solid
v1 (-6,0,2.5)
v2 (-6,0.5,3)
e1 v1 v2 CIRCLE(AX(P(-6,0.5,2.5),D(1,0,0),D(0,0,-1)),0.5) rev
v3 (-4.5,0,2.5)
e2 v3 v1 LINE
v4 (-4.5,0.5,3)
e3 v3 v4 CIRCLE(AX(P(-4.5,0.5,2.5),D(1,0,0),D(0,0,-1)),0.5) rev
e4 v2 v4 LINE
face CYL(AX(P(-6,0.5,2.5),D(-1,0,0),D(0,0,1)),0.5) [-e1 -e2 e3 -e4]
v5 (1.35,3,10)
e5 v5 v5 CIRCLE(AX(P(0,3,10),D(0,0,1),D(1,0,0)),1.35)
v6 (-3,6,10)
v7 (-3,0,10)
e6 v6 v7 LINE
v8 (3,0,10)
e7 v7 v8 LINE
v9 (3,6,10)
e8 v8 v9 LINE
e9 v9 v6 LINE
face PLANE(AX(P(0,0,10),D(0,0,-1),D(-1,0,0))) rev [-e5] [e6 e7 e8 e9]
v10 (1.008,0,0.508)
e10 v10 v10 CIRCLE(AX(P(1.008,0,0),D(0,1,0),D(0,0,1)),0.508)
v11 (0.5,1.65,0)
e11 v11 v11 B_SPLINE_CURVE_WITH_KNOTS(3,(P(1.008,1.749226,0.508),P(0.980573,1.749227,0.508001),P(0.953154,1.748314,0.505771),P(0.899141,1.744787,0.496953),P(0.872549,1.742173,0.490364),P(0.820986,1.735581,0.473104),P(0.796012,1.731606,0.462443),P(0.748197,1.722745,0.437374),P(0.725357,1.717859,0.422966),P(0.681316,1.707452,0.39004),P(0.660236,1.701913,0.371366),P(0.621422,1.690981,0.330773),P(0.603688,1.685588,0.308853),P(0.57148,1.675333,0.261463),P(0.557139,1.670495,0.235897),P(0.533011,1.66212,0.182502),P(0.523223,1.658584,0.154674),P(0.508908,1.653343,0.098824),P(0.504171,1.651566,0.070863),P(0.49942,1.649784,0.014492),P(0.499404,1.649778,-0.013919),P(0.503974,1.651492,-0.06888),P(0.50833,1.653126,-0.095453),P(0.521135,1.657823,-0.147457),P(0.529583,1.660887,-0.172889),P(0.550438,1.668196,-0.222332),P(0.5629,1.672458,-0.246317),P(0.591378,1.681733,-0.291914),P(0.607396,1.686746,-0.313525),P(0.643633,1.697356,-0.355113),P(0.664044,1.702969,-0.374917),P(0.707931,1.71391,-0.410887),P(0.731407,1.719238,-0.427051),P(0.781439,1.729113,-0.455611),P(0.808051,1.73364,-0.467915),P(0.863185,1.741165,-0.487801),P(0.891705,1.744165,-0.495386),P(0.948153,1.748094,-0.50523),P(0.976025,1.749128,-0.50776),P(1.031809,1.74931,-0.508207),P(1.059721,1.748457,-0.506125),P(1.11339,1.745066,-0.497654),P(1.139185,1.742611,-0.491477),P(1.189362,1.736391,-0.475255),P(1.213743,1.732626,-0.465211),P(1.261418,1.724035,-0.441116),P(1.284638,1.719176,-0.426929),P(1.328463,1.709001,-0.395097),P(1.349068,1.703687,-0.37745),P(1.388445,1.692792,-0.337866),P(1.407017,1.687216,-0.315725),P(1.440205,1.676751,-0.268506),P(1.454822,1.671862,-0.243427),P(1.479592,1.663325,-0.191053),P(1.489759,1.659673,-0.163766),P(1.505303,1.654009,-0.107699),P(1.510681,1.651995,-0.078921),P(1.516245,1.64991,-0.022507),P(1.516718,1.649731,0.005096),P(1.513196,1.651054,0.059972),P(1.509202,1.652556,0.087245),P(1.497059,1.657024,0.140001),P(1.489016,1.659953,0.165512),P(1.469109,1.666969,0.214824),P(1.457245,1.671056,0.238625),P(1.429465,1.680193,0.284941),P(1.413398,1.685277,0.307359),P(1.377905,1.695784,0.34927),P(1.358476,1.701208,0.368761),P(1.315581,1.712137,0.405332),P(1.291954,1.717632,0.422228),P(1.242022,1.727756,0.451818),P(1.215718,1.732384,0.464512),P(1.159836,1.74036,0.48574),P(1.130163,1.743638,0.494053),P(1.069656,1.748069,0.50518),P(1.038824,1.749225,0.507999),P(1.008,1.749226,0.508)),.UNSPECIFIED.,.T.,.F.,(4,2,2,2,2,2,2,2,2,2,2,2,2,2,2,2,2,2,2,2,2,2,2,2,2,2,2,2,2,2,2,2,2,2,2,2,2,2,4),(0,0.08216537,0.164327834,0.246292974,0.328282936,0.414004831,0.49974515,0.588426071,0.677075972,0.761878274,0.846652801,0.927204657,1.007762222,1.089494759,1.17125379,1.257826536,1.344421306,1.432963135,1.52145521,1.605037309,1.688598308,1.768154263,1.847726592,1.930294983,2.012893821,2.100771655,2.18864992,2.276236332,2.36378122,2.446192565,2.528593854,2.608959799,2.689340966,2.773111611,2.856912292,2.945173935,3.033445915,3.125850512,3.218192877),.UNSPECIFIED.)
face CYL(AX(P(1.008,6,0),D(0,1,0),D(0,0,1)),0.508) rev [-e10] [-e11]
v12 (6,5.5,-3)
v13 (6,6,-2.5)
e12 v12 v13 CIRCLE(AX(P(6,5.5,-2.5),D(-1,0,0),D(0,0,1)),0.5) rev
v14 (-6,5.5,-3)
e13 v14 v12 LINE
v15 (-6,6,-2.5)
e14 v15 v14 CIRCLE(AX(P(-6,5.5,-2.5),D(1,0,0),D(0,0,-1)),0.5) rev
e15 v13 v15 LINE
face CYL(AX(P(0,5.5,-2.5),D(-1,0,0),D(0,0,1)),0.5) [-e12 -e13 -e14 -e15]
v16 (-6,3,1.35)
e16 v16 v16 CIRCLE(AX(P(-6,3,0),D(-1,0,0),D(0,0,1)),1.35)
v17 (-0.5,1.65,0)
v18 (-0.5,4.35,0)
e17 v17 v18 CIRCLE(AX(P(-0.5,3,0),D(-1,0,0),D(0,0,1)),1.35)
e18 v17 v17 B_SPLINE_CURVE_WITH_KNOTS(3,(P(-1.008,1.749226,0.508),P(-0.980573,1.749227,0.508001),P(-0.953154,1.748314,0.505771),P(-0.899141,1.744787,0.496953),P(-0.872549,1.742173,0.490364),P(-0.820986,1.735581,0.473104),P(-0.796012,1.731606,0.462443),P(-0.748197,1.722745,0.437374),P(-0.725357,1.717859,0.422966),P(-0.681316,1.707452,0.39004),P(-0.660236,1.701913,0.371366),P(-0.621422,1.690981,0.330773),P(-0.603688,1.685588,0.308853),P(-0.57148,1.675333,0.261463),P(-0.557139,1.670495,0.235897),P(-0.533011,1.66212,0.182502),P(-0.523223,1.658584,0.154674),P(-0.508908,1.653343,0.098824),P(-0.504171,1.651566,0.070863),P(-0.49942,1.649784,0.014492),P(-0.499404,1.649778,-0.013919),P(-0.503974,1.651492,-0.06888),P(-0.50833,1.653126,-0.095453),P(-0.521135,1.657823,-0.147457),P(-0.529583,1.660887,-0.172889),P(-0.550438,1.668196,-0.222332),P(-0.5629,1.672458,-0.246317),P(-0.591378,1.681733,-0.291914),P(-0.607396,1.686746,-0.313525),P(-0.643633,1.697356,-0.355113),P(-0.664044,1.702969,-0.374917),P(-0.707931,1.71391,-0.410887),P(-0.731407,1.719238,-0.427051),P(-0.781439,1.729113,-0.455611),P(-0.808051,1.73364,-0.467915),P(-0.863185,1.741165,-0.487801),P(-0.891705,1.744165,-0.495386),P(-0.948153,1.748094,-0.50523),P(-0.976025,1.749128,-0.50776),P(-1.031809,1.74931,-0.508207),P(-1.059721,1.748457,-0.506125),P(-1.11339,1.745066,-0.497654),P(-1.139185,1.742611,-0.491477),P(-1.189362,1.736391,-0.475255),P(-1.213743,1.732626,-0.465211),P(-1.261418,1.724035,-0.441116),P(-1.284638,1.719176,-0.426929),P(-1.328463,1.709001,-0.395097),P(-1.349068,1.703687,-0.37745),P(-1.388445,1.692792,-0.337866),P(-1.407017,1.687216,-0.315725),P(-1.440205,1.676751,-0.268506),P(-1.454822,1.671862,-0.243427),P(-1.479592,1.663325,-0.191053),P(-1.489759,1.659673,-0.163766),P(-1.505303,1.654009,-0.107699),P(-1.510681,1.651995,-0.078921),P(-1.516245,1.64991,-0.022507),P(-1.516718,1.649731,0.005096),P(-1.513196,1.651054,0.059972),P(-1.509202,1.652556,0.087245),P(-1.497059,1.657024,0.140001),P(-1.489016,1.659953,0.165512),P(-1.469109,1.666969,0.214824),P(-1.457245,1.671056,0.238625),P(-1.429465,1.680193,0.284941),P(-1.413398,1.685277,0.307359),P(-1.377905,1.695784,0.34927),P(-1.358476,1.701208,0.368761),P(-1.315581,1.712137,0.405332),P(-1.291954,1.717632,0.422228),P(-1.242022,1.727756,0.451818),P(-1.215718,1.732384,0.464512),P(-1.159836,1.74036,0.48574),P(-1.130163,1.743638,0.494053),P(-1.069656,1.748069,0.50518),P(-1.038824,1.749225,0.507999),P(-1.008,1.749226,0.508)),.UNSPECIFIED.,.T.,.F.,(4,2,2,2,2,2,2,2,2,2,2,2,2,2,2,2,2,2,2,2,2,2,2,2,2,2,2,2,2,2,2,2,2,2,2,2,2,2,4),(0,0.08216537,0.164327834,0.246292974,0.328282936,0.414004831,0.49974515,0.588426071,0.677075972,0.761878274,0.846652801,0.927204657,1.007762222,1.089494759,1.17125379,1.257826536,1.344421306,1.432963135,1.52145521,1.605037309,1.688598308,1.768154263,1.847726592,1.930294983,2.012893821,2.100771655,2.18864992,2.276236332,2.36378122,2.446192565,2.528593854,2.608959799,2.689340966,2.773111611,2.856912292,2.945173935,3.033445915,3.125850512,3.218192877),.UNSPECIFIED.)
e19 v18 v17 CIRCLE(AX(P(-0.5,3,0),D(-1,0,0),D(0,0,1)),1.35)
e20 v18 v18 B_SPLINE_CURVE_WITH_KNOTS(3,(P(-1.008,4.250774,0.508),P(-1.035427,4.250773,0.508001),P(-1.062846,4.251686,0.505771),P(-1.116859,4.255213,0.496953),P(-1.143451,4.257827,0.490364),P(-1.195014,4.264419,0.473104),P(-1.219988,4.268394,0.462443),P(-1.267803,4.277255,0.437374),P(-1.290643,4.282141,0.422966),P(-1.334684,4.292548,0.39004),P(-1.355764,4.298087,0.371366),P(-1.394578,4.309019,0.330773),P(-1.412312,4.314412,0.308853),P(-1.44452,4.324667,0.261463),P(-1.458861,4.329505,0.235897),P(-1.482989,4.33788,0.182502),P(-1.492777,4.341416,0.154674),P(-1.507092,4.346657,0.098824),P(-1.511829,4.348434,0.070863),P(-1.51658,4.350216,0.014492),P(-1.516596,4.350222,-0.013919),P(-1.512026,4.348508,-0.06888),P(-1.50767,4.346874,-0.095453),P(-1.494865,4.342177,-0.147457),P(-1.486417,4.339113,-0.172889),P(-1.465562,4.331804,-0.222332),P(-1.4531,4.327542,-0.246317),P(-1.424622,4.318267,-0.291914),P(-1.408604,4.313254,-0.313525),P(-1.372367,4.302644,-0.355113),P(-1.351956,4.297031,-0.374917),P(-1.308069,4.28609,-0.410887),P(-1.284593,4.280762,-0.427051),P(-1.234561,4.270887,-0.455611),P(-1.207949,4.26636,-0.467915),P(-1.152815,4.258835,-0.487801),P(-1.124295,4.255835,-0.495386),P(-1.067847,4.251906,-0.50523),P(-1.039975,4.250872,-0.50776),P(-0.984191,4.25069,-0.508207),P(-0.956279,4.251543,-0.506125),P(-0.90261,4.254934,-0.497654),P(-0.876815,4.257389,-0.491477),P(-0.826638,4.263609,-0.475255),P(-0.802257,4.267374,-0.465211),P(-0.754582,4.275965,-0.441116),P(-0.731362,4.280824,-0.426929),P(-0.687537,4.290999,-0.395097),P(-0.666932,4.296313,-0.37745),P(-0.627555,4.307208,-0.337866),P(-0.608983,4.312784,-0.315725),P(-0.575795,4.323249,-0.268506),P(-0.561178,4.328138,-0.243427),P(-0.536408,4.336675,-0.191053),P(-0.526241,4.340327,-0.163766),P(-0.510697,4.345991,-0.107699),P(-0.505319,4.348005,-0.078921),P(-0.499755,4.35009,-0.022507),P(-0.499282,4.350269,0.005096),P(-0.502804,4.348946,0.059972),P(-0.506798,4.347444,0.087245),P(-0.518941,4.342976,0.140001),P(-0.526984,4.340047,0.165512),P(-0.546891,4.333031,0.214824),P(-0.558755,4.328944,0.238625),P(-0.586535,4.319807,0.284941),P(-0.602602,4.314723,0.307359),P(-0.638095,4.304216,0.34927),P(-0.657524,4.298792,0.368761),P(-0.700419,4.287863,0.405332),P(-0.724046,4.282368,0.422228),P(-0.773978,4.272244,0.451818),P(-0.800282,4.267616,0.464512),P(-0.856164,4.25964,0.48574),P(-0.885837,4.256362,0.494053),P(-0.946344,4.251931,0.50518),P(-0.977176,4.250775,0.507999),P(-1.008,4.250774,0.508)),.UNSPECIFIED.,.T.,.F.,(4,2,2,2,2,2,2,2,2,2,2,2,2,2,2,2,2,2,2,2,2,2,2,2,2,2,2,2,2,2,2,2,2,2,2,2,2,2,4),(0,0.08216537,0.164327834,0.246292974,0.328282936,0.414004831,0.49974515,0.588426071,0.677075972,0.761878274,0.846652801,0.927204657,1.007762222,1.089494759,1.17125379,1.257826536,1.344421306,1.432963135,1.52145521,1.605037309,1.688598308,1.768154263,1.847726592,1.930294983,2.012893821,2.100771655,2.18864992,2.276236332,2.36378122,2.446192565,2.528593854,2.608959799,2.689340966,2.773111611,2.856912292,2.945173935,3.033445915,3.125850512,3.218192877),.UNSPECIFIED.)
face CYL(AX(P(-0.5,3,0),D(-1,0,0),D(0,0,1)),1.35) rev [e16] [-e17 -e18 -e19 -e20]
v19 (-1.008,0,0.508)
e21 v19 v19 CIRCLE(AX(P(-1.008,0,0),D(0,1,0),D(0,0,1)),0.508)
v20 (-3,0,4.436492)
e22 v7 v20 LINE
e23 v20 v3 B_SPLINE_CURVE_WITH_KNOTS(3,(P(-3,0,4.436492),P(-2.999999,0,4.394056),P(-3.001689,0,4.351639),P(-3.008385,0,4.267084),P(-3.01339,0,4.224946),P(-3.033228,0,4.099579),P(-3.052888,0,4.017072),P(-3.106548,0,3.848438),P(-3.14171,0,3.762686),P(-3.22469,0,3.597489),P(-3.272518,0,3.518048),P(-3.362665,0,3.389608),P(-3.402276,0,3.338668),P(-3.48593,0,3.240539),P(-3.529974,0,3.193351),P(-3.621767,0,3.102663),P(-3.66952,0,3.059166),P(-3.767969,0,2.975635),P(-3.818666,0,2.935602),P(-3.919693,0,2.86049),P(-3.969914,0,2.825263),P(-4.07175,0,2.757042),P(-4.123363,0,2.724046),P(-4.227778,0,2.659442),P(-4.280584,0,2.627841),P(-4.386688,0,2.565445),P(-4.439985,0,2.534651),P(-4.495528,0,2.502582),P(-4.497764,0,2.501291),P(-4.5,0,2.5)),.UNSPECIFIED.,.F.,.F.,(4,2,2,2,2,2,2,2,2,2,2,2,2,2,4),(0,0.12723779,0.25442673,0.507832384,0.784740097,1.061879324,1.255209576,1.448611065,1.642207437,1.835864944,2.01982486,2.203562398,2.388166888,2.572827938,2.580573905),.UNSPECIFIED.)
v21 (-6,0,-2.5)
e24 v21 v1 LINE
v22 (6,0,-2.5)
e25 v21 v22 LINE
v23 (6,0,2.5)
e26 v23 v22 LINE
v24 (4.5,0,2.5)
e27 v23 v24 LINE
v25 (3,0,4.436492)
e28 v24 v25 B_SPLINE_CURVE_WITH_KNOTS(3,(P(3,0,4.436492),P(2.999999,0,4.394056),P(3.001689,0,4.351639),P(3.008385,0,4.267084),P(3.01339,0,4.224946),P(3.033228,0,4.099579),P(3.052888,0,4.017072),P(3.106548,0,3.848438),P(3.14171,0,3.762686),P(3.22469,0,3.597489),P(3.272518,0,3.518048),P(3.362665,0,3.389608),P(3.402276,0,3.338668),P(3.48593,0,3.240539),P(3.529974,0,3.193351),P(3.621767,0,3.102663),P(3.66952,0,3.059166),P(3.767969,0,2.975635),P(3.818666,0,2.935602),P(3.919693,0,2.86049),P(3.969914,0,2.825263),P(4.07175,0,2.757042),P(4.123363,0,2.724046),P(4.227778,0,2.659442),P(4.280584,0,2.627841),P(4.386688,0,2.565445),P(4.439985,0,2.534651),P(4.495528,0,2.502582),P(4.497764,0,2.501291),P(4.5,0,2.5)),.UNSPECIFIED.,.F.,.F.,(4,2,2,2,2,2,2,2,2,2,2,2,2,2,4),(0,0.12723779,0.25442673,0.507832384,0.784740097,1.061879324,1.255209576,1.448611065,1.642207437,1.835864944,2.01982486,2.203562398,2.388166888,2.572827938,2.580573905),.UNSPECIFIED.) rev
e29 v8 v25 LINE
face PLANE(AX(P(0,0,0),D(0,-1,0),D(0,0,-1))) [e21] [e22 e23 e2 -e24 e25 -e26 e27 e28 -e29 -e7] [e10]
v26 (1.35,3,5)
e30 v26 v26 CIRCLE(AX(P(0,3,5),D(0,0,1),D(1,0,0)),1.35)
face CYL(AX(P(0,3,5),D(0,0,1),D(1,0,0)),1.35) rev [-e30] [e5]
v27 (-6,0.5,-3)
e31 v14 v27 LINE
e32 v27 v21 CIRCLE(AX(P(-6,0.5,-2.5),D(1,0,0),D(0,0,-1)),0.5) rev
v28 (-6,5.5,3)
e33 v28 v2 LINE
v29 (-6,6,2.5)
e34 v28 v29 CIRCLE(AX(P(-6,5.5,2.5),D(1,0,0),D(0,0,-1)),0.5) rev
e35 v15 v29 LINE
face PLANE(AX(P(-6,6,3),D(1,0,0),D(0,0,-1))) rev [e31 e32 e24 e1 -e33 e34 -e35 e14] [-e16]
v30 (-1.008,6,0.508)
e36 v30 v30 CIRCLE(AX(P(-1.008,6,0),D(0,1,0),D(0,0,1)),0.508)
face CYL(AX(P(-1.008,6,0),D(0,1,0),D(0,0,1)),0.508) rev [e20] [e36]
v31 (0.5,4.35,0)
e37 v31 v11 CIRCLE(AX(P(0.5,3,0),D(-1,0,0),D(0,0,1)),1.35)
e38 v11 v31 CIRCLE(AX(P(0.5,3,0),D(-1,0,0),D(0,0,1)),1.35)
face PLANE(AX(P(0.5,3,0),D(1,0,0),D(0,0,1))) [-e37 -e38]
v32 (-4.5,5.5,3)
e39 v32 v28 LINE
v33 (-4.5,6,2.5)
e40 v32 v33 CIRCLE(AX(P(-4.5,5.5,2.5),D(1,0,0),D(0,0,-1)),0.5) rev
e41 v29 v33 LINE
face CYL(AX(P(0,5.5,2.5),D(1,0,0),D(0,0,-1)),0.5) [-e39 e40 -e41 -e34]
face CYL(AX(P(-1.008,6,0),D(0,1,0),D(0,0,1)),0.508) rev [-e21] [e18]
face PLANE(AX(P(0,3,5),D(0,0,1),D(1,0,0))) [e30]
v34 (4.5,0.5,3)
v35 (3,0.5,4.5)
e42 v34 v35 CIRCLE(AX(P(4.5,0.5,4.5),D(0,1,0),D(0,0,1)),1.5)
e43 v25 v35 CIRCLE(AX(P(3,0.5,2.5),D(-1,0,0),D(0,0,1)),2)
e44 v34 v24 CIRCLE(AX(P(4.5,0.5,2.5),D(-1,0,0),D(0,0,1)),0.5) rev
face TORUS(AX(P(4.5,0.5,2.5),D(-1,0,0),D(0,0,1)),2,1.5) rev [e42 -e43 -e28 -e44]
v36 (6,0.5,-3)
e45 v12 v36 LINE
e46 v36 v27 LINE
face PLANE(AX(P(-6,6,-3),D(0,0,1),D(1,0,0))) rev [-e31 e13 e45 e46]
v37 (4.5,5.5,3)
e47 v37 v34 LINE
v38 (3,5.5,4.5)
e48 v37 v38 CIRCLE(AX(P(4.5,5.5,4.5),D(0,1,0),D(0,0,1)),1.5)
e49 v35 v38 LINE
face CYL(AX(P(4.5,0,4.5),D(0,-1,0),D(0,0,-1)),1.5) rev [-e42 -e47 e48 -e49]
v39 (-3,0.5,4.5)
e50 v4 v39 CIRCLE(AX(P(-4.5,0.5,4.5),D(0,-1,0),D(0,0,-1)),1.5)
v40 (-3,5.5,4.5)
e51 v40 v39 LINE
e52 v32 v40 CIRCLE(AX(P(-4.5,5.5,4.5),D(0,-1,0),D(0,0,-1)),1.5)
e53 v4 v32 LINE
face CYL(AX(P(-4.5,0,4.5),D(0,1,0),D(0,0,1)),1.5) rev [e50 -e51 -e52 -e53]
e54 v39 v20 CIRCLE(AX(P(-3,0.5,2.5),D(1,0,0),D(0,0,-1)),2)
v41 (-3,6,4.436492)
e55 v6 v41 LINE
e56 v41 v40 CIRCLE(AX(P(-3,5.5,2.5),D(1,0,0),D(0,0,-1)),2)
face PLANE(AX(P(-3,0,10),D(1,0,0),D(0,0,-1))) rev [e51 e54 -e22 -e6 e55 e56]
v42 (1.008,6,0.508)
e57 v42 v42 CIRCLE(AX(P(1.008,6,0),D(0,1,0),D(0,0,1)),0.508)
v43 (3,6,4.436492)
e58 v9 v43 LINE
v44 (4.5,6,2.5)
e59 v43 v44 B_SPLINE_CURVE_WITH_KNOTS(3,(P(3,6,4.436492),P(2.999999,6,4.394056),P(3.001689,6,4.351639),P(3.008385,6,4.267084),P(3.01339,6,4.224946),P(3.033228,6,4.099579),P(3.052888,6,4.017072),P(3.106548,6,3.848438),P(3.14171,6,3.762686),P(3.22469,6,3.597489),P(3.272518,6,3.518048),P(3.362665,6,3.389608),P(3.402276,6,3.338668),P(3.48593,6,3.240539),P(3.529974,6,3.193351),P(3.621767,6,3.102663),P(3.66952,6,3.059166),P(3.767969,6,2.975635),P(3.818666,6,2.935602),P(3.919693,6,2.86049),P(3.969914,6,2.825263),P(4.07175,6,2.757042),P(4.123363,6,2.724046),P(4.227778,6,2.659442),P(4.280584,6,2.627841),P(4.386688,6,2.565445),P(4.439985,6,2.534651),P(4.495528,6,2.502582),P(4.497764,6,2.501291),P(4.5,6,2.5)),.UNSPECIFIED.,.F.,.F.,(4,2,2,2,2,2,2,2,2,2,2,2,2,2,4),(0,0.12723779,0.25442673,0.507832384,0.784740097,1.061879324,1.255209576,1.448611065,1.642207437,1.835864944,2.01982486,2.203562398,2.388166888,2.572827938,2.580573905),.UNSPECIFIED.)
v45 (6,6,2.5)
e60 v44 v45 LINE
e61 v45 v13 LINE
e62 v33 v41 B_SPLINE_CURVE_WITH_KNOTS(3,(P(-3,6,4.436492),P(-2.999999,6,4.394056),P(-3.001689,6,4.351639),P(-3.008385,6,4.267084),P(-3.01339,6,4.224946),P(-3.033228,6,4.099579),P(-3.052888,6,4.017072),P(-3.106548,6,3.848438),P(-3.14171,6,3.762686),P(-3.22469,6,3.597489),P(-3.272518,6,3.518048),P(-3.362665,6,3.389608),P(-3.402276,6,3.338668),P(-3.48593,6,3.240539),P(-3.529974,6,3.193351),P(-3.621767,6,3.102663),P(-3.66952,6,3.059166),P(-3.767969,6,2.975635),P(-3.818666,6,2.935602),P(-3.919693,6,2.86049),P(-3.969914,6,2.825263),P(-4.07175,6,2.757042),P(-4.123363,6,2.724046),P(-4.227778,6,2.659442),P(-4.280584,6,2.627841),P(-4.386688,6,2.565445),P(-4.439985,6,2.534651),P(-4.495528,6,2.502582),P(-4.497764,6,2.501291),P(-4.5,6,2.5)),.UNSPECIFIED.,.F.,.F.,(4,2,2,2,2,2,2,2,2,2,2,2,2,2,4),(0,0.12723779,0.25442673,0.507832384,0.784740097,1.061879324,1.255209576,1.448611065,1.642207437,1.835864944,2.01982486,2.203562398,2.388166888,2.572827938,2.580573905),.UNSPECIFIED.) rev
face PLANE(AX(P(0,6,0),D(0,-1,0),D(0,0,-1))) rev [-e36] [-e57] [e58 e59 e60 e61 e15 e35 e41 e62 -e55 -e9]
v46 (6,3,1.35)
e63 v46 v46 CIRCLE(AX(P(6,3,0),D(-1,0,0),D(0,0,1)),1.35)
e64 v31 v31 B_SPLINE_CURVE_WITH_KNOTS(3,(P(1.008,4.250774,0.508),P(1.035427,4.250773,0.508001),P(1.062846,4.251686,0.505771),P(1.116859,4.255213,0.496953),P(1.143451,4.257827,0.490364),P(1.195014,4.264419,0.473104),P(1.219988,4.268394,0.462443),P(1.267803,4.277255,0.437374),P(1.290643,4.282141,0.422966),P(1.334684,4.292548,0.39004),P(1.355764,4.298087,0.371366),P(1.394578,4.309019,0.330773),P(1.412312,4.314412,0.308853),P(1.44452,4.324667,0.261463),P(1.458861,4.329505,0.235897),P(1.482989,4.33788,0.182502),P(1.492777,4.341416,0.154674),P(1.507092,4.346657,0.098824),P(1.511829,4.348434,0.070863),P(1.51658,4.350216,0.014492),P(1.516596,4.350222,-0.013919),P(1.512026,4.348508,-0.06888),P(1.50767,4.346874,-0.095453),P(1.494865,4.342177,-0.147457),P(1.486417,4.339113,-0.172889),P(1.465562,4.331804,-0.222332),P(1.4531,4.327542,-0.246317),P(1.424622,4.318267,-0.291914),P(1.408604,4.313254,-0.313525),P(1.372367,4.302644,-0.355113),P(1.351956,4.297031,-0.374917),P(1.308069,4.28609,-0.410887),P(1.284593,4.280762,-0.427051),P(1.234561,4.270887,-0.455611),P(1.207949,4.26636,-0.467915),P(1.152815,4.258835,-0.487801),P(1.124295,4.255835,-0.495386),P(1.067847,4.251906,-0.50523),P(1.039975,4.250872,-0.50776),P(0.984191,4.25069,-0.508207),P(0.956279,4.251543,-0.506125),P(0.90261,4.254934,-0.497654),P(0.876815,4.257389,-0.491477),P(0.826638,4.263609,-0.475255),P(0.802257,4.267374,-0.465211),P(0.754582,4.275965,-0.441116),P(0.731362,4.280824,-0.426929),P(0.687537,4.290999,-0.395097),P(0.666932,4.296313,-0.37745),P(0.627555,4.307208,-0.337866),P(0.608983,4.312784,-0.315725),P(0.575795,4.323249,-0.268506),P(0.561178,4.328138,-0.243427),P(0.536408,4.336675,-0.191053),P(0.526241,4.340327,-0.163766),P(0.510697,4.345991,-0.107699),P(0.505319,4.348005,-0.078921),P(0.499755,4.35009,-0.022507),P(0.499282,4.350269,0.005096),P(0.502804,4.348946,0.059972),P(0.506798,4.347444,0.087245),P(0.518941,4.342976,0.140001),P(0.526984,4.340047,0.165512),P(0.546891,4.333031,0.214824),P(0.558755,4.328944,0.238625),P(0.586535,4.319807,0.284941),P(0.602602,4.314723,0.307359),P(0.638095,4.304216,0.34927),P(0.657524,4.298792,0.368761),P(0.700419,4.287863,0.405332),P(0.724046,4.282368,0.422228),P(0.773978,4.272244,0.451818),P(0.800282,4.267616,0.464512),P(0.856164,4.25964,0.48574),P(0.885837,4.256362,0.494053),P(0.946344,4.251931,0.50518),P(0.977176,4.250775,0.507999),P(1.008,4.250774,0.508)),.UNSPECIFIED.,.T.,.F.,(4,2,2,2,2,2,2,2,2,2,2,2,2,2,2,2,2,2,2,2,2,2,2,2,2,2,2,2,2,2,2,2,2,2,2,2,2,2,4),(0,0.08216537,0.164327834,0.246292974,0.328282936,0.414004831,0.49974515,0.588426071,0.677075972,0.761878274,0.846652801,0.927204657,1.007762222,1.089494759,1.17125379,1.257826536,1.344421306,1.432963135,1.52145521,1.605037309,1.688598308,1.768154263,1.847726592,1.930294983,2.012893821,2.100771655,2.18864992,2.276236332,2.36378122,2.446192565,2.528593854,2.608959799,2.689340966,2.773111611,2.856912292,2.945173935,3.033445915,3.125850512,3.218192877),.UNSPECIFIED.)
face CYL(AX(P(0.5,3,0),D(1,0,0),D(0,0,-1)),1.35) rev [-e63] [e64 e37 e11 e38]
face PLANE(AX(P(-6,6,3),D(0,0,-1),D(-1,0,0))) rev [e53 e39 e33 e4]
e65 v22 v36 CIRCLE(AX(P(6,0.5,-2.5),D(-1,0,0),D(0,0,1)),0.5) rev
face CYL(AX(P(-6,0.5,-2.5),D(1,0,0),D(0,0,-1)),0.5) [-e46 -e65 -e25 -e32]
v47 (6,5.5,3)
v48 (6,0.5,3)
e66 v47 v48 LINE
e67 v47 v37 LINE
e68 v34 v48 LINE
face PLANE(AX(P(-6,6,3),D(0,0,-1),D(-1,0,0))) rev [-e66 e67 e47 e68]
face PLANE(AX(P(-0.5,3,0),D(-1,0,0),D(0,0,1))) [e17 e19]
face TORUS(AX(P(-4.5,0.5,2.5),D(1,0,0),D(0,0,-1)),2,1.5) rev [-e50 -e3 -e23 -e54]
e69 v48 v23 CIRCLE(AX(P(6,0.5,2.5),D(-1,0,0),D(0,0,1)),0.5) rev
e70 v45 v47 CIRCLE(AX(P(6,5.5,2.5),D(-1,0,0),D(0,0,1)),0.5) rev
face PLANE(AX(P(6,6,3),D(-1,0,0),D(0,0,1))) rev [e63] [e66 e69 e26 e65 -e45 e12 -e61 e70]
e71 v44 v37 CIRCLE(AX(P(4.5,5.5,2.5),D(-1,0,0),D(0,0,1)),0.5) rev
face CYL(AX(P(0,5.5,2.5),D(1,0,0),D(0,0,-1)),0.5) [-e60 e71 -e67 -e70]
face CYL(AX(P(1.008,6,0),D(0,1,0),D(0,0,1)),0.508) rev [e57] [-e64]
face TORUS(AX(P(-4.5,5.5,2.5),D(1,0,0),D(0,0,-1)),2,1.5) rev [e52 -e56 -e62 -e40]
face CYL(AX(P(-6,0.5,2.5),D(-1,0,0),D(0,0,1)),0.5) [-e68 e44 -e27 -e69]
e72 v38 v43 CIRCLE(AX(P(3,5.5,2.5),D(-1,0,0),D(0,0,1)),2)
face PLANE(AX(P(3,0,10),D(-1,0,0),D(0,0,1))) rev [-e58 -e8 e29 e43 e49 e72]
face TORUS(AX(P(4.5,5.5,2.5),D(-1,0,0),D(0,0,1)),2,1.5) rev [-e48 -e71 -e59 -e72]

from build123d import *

# Parameters (mm, degrees)
SKETCH1_W                  = 12
SKETCH1_H                  = 6
BOSS_EXTRUDE1_DEPTH        = 6
F_60_0_04_DIAMETER_HOLE1_D = 1.016
SKETCH15_W                 = 6
SKETCH15_H                 = 6
BOSS_EXTRUDE2_DEPTH        = 7
FILLET4_R                  = 0.5
FILLET3_R                  = 1.5
SKETCH19_R                 = 1.35
CUT_EXTRUDE1_DEPTH         = 5.5
SKETCH16_R                 = 1.35
CUT_EXTRUDE2_DEPTH         = 5


with BuildPart() as part:
    # Sketch1 → Boss-Extrude1 (new body)
    with BuildSketch(Plane(origin=(0, 0, 0), x_dir=(1, 0, 0), z_dir=(0, 1, 0))):
        Rectangle(SKETCH1_W, SKETCH1_H)
    extrude(amount=BOSS_EXTRUDE1_DEPTH)

    # #60 (0.04) Diameter Hole1 (through all)
    with Locations(Plane(origin=(0, 6, 0), x_dir=(1, 0, 0), z_dir=(0, 1, 0))):
        with Locations((1.008, 0), (-1.008, 0)):
            Hole(F_60_0_04_DIAMETER_HOLE1_D / 2)

    # Sketch15 → Boss-Extrude2 (add)
    with BuildSketch(Plane.XY.offset(3)):
        with Locations((0, 3)):
            Rectangle(SKETCH15_W, SKETCH15_H)
    extrude(amount=BOSS_EXTRUDE2_DEPTH)

    # Fillet4
    fillet4_edges = [part.edges().sort_by_distance(p)[0] for p in [
        (4.5, 6, 3),
        (4.5, 0, 3),
        (-4.5, 0, 3),
        (0, 0, -3),
        (0, 6, -3),
        (-4.5, 6, 3),
    ]]
    fillet(fillet4_edges, radius=FILLET4_R)

    # Fillet3
    fillet3_edges = [part.edges().sort_by_distance(p)[0] for p in [
        (-3, 3, 3),
        (-3, 0.146446609, 2.853553391),
        (-3, 5.853553391, 2.853553391),
    ]]
    fillet(fillet3_edges, radius=FILLET3_R)
    fillet3_2_edges = [part.edges().sort_by_distance(p)[0] for p in [
        (3, 5.853553391, 2.853553391),
        (3, 3, 3),
        (3, 0.146446609, 2.853553391),
    ]]
    fillet(fillet3_2_edges, radius=FILLET3_R)

    # Sketch19 → Cut-Extrude1 (cut)
    with BuildSketch(Plane.ZY.offset(6)):
        with Locations((0, 3)):
            Circle(SKETCH19_R)
    cut_extrude1 = extrude(amount=-CUT_EXTRUDE1_DEPTH, mode=Mode.SUBTRACT)

    # Sketch16 → Cut-Extrude2 (cut)
    with BuildSketch(Plane.XY.offset(10)):
        with Locations((0, 3)):
            Circle(SKETCH16_R)
    extrude(amount=-CUT_EXTRUDE2_DEPTH, mode=Mode.SUBTRACT)

    # Mirror2: Cut-Extrude1 across plane
    add(cut_extrude1.mirror(Plane(origin=(0, 0, 0), x_dir=(0, 0, 1), z_dir=(1, 0, 0))), mode=Mode.SUBTRACT)


solid = part.part
